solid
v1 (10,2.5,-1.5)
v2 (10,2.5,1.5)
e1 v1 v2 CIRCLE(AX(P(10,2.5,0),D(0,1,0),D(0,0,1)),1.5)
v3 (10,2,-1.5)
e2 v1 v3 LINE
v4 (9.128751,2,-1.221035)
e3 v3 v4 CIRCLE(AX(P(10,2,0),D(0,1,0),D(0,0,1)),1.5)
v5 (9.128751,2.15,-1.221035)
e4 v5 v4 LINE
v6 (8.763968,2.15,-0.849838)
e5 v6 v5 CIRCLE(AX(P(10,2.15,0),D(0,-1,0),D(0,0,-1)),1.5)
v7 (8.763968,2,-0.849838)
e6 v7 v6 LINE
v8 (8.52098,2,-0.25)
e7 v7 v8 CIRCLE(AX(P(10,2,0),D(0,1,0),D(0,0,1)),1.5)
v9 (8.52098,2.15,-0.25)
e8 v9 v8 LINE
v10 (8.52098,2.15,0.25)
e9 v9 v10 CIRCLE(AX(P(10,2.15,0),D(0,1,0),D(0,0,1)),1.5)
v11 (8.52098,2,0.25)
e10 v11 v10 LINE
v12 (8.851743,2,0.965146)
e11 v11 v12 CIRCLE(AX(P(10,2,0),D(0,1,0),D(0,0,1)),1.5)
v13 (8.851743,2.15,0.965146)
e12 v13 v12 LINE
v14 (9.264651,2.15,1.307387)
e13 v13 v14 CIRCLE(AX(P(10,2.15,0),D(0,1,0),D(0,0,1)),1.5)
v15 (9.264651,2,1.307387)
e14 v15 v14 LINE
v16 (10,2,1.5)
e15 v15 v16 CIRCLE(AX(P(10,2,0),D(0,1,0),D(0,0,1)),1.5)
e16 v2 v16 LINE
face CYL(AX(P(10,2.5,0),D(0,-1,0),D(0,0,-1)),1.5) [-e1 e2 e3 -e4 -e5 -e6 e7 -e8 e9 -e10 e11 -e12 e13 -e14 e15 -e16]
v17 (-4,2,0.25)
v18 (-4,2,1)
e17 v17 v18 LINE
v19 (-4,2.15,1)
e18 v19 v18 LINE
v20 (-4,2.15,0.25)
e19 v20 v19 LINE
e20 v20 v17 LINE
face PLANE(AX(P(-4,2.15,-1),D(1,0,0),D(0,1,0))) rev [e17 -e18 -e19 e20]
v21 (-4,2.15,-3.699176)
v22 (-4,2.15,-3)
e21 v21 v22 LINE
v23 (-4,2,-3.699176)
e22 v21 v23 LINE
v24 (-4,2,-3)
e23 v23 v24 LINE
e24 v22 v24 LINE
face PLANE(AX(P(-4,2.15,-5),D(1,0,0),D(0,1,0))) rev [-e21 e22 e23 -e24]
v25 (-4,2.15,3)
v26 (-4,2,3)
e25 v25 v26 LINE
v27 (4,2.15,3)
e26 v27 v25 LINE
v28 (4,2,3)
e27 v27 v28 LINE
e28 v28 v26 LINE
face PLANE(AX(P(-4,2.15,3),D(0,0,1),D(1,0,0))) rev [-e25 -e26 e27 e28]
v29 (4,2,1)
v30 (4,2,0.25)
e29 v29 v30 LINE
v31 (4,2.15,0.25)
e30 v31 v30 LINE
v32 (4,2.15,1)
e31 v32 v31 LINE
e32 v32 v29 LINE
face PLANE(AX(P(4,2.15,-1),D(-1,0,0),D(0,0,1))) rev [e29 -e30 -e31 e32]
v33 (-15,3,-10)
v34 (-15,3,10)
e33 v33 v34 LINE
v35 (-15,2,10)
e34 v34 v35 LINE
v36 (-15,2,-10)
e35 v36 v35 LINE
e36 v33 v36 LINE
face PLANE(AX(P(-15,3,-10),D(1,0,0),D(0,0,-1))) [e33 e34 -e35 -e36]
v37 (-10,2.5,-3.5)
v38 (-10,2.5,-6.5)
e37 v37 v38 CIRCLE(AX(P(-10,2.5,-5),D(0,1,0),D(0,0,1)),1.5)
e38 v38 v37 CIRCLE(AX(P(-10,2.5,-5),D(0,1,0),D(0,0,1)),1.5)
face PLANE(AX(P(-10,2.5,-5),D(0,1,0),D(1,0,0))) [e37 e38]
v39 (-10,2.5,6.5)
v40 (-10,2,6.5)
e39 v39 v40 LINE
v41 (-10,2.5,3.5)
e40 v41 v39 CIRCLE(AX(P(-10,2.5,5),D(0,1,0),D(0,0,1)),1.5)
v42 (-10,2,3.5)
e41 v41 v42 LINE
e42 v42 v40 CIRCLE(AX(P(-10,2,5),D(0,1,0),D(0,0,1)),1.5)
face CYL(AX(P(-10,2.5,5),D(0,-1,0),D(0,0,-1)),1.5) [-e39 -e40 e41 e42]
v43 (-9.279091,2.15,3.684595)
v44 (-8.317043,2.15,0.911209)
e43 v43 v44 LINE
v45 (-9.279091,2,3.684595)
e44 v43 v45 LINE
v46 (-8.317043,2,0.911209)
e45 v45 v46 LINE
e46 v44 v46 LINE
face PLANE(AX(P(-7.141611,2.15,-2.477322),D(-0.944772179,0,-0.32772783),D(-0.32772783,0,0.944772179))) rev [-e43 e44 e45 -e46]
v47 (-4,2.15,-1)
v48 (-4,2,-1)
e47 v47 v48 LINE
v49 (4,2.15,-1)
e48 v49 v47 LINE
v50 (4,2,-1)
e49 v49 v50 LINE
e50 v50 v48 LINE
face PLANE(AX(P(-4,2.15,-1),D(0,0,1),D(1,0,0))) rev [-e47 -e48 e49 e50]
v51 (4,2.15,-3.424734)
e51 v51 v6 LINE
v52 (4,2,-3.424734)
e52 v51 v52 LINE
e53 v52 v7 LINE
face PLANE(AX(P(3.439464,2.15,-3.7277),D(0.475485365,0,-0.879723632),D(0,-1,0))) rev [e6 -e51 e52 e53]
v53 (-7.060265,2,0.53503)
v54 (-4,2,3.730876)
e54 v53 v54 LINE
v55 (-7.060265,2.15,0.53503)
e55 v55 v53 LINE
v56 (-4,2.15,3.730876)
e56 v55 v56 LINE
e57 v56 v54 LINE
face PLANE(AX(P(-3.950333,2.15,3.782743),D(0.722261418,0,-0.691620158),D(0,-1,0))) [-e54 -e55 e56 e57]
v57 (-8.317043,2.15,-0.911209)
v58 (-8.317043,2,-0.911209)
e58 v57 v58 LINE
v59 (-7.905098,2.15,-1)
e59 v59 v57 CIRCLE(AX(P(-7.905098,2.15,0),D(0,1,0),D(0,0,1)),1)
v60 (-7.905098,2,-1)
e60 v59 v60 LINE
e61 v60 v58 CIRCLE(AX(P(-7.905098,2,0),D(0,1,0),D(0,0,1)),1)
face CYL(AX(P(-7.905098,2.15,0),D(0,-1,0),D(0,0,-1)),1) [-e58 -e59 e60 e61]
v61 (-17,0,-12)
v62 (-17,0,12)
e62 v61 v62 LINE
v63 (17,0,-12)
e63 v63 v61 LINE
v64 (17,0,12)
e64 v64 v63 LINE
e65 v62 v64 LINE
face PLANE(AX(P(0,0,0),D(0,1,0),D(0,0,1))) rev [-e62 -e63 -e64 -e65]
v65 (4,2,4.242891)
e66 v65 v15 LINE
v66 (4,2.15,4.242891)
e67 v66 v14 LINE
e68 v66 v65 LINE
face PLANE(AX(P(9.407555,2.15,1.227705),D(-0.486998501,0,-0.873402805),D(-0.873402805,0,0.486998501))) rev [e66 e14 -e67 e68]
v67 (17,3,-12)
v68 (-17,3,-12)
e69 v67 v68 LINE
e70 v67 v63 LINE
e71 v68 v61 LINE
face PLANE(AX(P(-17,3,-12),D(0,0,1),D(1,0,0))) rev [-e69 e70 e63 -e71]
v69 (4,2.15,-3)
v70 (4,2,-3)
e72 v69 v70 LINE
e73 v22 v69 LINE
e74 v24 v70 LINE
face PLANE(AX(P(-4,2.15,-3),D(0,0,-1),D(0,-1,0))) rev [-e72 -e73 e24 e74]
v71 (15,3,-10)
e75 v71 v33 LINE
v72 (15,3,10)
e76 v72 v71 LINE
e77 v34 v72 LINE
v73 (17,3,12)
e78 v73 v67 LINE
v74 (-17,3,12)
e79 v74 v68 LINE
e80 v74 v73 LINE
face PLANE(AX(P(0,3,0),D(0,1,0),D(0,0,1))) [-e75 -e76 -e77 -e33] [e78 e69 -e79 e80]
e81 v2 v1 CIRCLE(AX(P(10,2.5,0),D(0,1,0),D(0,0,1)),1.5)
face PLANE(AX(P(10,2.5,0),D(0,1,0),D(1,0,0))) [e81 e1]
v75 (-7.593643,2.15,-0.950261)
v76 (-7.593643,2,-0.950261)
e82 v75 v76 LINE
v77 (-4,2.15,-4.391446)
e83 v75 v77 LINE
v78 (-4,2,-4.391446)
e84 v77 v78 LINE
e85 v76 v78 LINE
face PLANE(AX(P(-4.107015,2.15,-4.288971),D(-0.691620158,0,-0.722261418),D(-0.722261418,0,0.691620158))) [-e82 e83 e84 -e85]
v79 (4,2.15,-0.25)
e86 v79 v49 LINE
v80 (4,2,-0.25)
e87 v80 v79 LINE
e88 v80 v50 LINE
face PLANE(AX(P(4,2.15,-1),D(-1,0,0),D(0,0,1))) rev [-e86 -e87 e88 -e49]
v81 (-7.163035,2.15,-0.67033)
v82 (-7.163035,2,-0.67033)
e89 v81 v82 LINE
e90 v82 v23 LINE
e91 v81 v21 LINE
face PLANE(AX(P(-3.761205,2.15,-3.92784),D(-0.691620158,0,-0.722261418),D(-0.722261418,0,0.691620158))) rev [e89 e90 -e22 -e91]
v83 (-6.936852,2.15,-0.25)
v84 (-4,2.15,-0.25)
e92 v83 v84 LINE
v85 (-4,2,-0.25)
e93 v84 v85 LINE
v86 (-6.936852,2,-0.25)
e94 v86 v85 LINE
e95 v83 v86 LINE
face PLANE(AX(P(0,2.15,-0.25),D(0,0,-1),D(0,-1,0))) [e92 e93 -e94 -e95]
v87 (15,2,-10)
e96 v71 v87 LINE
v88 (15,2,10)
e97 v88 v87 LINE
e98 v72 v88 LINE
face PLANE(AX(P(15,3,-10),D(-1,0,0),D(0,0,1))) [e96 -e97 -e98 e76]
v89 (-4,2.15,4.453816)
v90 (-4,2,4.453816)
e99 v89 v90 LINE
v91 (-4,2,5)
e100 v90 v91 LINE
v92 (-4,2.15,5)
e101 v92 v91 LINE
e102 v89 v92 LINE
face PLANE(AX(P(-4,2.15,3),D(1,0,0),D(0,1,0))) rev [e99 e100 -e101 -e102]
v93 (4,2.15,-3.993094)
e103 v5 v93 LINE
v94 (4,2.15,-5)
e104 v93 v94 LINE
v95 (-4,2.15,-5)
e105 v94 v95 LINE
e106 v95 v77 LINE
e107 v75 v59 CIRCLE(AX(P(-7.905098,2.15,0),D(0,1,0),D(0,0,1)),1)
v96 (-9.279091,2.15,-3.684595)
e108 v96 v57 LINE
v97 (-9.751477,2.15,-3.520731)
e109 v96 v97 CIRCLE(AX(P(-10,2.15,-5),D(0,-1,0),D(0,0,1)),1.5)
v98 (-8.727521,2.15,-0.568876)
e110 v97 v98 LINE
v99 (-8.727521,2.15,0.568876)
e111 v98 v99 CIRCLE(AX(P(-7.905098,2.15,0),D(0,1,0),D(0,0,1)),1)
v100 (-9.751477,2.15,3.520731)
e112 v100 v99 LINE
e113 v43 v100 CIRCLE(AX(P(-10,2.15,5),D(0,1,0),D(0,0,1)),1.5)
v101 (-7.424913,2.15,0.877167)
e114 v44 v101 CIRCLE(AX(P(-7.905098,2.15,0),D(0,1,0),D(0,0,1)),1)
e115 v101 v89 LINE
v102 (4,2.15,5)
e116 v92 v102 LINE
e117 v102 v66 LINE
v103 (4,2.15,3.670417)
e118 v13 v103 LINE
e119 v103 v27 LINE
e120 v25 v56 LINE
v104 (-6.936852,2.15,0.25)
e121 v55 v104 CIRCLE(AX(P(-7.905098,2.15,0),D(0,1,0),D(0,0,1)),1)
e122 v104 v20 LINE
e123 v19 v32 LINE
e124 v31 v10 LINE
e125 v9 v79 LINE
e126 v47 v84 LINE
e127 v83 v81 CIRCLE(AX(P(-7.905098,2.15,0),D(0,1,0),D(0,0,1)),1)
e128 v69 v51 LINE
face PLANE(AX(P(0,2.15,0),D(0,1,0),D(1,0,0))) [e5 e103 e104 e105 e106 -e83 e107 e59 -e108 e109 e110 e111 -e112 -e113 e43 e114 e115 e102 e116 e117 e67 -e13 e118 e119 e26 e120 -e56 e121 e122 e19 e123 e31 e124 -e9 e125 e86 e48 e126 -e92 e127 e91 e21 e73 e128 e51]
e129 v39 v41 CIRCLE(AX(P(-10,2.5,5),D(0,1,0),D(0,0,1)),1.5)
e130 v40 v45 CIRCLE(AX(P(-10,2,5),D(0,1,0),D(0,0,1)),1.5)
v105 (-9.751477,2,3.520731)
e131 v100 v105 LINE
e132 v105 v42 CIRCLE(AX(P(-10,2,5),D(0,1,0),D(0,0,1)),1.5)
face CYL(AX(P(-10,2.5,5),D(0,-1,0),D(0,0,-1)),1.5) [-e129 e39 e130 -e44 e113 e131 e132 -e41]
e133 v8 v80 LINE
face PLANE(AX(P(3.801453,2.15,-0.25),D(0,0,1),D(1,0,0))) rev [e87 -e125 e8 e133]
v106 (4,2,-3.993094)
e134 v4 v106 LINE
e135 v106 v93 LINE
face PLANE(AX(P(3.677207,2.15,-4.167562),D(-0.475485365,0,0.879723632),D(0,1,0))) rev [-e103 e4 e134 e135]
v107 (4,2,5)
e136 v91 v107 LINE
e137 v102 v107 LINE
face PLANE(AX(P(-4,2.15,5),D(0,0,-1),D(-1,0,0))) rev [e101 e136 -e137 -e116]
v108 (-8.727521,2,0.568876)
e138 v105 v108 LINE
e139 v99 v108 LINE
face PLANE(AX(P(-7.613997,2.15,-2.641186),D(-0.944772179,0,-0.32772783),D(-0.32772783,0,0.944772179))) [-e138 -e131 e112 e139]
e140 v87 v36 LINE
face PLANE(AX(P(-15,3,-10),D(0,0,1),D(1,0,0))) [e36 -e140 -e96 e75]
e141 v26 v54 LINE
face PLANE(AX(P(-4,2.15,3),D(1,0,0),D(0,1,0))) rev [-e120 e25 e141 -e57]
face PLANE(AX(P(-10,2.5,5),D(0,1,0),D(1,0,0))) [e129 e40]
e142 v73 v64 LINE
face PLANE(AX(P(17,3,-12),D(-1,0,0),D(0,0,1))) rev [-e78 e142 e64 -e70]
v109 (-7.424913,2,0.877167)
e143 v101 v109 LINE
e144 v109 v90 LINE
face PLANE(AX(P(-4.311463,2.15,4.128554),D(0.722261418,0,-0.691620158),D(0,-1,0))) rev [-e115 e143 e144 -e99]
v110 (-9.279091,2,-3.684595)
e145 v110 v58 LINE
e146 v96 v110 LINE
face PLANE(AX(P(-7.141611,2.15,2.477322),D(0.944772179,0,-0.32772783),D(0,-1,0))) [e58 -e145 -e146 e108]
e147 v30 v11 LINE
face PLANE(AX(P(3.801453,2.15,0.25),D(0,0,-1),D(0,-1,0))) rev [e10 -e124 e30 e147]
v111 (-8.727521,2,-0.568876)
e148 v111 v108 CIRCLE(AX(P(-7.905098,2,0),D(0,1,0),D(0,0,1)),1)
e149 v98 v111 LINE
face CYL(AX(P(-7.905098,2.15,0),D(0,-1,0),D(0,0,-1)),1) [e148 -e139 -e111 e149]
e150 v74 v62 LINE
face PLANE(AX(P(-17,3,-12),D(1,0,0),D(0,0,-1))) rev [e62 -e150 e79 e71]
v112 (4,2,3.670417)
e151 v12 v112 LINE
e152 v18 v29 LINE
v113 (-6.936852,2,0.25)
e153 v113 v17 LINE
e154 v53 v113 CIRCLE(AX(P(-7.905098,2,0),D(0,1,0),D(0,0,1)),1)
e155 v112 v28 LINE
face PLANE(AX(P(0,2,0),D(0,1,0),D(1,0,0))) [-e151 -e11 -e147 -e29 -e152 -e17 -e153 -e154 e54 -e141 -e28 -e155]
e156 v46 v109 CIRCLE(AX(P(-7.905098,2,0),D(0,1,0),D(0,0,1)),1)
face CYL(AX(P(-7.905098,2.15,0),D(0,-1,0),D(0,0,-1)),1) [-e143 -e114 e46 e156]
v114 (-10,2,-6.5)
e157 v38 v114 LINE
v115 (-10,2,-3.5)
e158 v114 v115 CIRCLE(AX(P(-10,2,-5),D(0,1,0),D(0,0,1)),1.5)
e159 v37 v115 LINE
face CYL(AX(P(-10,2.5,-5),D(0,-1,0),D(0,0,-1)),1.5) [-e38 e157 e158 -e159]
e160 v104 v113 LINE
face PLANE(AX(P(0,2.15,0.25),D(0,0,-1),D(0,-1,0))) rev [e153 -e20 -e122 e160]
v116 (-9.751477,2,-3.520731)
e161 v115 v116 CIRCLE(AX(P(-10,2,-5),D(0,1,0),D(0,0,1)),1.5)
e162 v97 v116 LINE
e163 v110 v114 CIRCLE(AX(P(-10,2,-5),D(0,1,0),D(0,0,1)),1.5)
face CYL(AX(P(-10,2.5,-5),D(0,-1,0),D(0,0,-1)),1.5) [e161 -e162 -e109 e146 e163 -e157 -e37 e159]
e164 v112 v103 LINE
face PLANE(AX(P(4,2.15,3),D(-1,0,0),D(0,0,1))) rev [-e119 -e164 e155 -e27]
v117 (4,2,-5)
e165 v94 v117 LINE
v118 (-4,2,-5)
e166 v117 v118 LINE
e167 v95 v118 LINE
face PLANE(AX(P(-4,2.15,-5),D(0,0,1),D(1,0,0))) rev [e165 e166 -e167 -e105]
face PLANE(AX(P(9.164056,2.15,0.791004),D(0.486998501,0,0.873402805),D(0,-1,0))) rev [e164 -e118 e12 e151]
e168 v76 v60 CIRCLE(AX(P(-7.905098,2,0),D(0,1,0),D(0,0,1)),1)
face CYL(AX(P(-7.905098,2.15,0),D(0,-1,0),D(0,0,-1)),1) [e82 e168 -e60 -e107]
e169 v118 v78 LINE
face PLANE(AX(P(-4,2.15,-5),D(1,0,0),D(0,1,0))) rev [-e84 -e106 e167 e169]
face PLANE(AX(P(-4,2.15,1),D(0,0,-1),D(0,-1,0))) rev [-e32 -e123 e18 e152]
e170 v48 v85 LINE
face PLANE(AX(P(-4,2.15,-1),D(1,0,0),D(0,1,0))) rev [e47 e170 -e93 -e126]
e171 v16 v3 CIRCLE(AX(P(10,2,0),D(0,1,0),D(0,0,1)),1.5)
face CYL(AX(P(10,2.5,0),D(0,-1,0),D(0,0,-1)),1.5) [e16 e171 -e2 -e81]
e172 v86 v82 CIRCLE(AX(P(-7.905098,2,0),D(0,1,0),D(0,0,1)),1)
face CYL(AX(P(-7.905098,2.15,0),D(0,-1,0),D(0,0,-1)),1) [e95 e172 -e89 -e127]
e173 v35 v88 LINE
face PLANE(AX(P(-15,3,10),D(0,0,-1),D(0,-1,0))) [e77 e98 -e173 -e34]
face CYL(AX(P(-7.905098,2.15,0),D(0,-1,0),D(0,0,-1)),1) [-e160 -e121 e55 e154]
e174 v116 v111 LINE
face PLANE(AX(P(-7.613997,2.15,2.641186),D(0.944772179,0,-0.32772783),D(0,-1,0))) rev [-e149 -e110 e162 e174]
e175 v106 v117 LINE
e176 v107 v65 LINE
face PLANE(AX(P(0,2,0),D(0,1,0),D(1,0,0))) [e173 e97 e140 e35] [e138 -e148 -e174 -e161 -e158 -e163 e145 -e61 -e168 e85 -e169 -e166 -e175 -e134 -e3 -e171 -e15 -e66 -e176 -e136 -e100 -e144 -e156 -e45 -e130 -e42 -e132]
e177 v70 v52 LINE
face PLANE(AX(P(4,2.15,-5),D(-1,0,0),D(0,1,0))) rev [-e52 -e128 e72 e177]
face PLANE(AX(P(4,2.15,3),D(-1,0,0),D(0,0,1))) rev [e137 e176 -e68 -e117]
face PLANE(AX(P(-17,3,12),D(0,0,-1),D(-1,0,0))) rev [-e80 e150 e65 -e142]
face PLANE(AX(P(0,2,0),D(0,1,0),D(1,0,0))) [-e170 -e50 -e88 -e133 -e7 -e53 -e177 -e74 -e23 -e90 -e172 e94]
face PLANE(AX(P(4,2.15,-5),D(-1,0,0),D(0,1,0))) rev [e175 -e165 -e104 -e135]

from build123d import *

# Parameters (mm, degrees)
CROQUIS1_W              = 34
CROQUIS1_H              = 24
SALIENTE_EXTRUIR1_DEPTH = 3
CAVIDAD1_START          = 2
CAVIDAD1_OUTLINE_W      = 30
CAVIDAD1_OUTLINE_H      = 20
CAVIDAD1_DEPTH          = 1
CAVIDAD1_START_2        = 2.15
CAVIDAD1_2_DEPTH        = 0.85
CAVIDAD1_START_3        = 2.5
CAVIDAD1_3_OUTLINE_R    = 1.5
CAVIDAD1_3_DEPTH        = 0.5
SALIENTE_EXTRUIR3_DEPTH = 0.5
CROQUIS6_W              = 7.77529117
CROQUIS6_H              = 2
CROQUIS6_W_2            = 2
CROQUIS6_H_2            = 19.575879517
CROQUIS6_W_3            = 7.699177506
CROQUIS6_H_3            = 2.365035227
CROQUIS6_W_4            = 2.895421418
CROQUIS6_W_5            = 7.822528086
CROQUIS6_H_4            = 2.895421418
CROQUIS6_W_6            = 2.695737182
CORTAR_EXTRUIR1_DEPTH   = 0.5


# Read off the part's stored shape, not the designer's step: Cavidad1
with BuildPart() as part:
    # Croquis1 → Saliente-Extruir1 (new body)
    with BuildSketch(Plane(origin=(0, 0, 0), x_dir=(1, 0, 0), z_dir=(0, 1, 0))):
        Rectangle(CROQUIS1_W, CROQUIS1_H)
    extrude(amount=SALIENTE_EXTRUIR1_DEPTH)

    # Cavidad1 outline → Cavidad1 (cut)
    # profile 1 of 3: a face of its own
    with BuildSketch(Plane(origin=(0, 0, 0), x_dir=(1, 0, 0), z_dir=(0, 1, 0)).offset(CAVIDAD1_START)):
        Rectangle(CAVIDAD1_OUTLINE_W, CAVIDAD1_OUTLINE_H)
        with BuildLine():
            Line((-9.751477048, -3.520731146), (-8.727521258, -0.568876422))
            ThreePointArc((-8.727521258, -0.568876422), (-8.905098242, 0), (-8.727521258, 0.568876422))
            Line((-8.727521258, 0.568876422), (-9.751477048, 3.520731146))
            ThreePointArc((-9.751477048, 3.520731146), (-10.491591745, 6.417158268), (-9.279090958, 3.684595061))
            Line((-9.279090958, 3.684595061), (-8.317043268, 0.911208701))
            ThreePointArc((-8.317043268, 0.911208701), (-8.115800994, 0.977550178), (-7.905098242, 1))
            ThreePointArc((-7.905098242, 1), (-7.74739704, 0.987486876), (-7.593642508, 0.950260662))
            Line((-7.593642508, 0.950260662), (-4, 4.391446273))
            Line((-4, 4.391446273), (-4, 5))
            Line((-4, 5), (4, 5))
            Line((4, 5), (4, 3.993093842))
            Line((4, 3.993093842), (9.128751089, 1.221034535))
            ThreePointArc((9.128751089, 1.221034535), (11.497837988, 0.08050691), (9.264650579, -1.307387176))
            Line((9.264650579, -1.307387176), (4, -4.242890617))
            Line((4, -4.242890617), (4, -5))
            Line((4, -5), (-4, -5))
            Line((-4, -5), (-4, -4.453815845))
            Line((-4, -4.453815845), (-7.424912859, -0.87716703))
            ThreePointArc((-7.424912859, -0.87716703), (-7.866968261, -0.999272788), (-8.317043268, -0.911208701))
            Line((-8.317043268, -0.911208701), (-9.279090958, -3.684595061))
            ThreePointArc((-9.279090958, -3.684595061), (-10.491591745, -6.417158268), (-9.751477048, -3.520731146))
        make_face(mode=Mode.SUBTRACT)
    # profile 2 of 3: a face of its own
    with BuildSketch(Plane(origin=(0, 0, 0), x_dir=(1, 0, 0), z_dir=(0, 1, 0)).offset(CAVIDAD1_START)):
        with BuildLine():
            ThreePointArc((8.520980054, 0.25), (8.609737932, 0.563179707), (8.763967569, 0.849837532))
            Line((8.763967569, 0.849837532), (4, 3.424733527))
            Line((4, 3.424733527), (4, 3))
            Line((4, 3), (-4, 3))
            Line((-4, 3), (-4, 3.699176151))
            Line((-4, 3.699176151), (-7.163035026, 0.670329906))
            ThreePointArc((-7.163035026, 0.670329906), (-7.024496987, 0.473858025), (-6.936852406, 0.25))
            Line((-6.936852406, 0.25), (-4, 0.25))
            Line((-4, 0.25), (-4, 1))
            Line((-4, 1), (4, 1))
            Line((4, 1), (4, 0.25))
            Line((4, 0.25), (8.520980054, 0.25))
        make_face()
    # profile 3 of 3: a face of its own
    with BuildSketch(Plane(origin=(0, 0, 0), x_dir=(1, 0, 0), z_dir=(0, 1, 0)).offset(CAVIDAD1_START)):
        with BuildLine():
            Line((4, -3.670417072), (8.851743131, -0.96514567))
            ThreePointArc((8.851743131, -0.96514567), (8.63856539, -0.629679127), (8.520980054, -0.25))
            Line((8.520980054, -0.25), (4, -0.25))
            Line((4, -0.25), (4, -1))
            Line((4, -1), (-4, -1))
            Line((-4, -1), (-4, -0.25))
            Line((-4, -0.25), (-6.936852406, -0.25))
            ThreePointArc((-6.936852406, -0.25), (-6.987424899, -0.397335669), (-7.060265081, -0.535029839))
            Line((-7.060265081, -0.535029839), (-4, -3.730875667))
            Line((-4, -3.730875667), (-4, -3))
            Line((-4, -3), (4, -3))
            Line((4, -3), (4, -3.670417072))
        make_face()
    extrude(amount=CAVIDAD1_DEPTH, mode=Mode.SUBTRACT)

    # Cavidad1 2 outline → Cavidad1 2 (cut)
    with BuildSketch(Plane(origin=(0, 0, 0), x_dir=(1, 0, 0), z_dir=(0, 1, 0)).offset(CAVIDAD1_START_2)):
        with BuildLine():
            ThreePointArc((-8.727521258, 0.568876422), (-8.905098242, 0), (-8.727521258, -0.568876422))
            Line((-8.727521258, -0.568876422), (-9.751477048, -3.520731146))
            ThreePointArc((-9.751477048, -3.520731146), (-9.508408255, -3.582841732), (-9.279090958, -3.684595061))
            Line((-9.279090958, -3.684595061), (-8.317043268, -0.911208701))
            ThreePointArc((-8.317043268, -0.911208701), (-7.866968261, -0.999272788), (-7.424912859, -0.87716703))
            Line((-7.424912859, -0.87716703), (-4, -4.453815845))
            Line((-4, -4.453815845), (-4, -5))
            Line((-4, -5), (4, -5))
            Line((4, -5), (4, -4.242890617))
            Line((4, -4.242890617), (9.264650579, -1.307387176))
            ThreePointArc((9.264650579, -1.307387176), (9.042777207, -1.154869917), (8.851743131, -0.96514567))
            Line((8.851743131, -0.96514567), (4, -3.670417072))
            Line((4, -3.670417072), (4, -3))
            Line((4, -3), (-4, -3))
            Line((-4, -3), (-4, -3.730875667))
            Line((-4, -3.730875667), (-7.060265081, -0.535029839))
            ThreePointArc((-7.060265081, -0.535029839), (-6.987424899, -0.397335669), (-6.936852406, -0.25))
            Line((-6.936852406, -0.25), (-4, -0.25))
            Line((-4, -0.25), (-4, -1))
            Line((-4, -1), (4, -1))
            Line((4, -1), (4, -0.25))
            Line((4, -0.25), (8.520980054, -0.25))
            ThreePointArc((8.520980054, -0.25), (8.5, 0), (8.520980054, 0.25))
            Line((8.520980054, 0.25), (4, 0.25))
            Line((4, 0.25), (4, 1))
            Line((4, 1), (-4, 1))
            Line((-4, 1), (-4, 0.25))
            Line((-4, 0.25), (-6.936852406, 0.25))
            ThreePointArc((-6.936852406, 0.25), (-7.024496987, 0.473858025), (-7.163035026, 0.670329906))
            Line((-7.163035026, 0.670329906), (-4, 3.699176151))
            Line((-4, 3.699176151), (-4, 3))
            Line((-4, 3), (4, 3))
            Line((4, 3), (4, 3.424733527))
            Line((4, 3.424733527), (8.763967569, 0.849837532))
            ThreePointArc((8.763967569, 0.849837532), (8.930137641, 1.051377446), (9.128751089, 1.221034535))
            Line((9.128751089, 1.221034535), (4, 3.993093842))
            Line((4, 3.993093842), (4, 5))
            Line((4, 5), (-4, 5))
            Line((-4, 5), (-4, 4.391446273))
            Line((-4, 4.391446273), (-7.593642508, 0.950260662))
            ThreePointArc((-7.593642508, 0.950260662), (-7.74739704, 0.987486876), (-7.905098242, 1))
            ThreePointArc((-7.905098242, 1), (-8.115800994, 0.977550178), (-8.317043268, 0.911208701))
            Line((-8.317043268, 0.911208701), (-9.279090958, 3.684595061))
            ThreePointArc((-9.279090958, 3.684595061), (-9.508408255, 3.582841732), (-9.751477048, 3.520731146))
            Line((-9.751477048, 3.520731146), (-8.727521258, 0.568876422))
        make_face()
    extrude(amount=CAVIDAD1_2_DEPTH, mode=Mode.SUBTRACT)

    # Cavidad1 3 outline → Cavidad1 3 (cut)
    with BuildSketch(Plane(origin=(0, 0, 0), x_dir=(1, 0, 0), z_dir=(0, 1, 0)).offset(CAVIDAD1_START_3)):
        with Locations((-10, -5)):
            Circle(CAVIDAD1_3_OUTLINE_R)
        with Locations((-10, 5)):
            Circle(CAVIDAD1_3_OUTLINE_R)
        with Locations((10, 0)):
            Circle(CAVIDAD1_3_OUTLINE_R)
    extrude(amount=CAVIDAD1_3_DEPTH, mode=Mode.SUBTRACT)

    # Croquis5 → Saliente-Extruir3 (add)
    with BuildSketch(Plane(origin=(0, 3, 0), x_dir=(1, 0, 0), z_dir=(0, 1, 0))):
        Polygon((-17, 12), (-7, 12), (-7, 10), (-15, 10), (-15, -10), (-7, -10), (-7, -12), (-17, -12), align=None)
        Polygon((7, 12), (17, 12), (17, -12), (7, -12), (7, -10), (15, -10), (15, 10), (7, 10), align=None)
    extrude(amount=SALIENTE_EXTRUIR3_DEPTH)

    # Croquis6 → Cortar-Extruir1 (cut)
    with BuildSketch(Plane(origin=(0, 3.5, 0), x_dir=(1, 0, 0), z_dir=(0, 1, 0))):
        with Locations((-10.887645585, -11)):
            Rectangle(CROQUIS6_W, CROQUIS6_H)
        with Locations((-16, -0.159576746)):
            Rectangle(CROQUIS6_W_2, CROQUIS6_H_2)
        with Locations((-10.887645585, 11)):
            Rectangle(CROQUIS6_W, CROQUIS6_H)
        Polygon((-17, 12), (-17, 9.628363012), (-15, 9.628363012), (-15, 10), (-14.77529117, 10), (-14.77529117, 12), align=None)
        Polygon((-15, -9.947516505), (-17, -9.947516505), (-17, -12), (-14.77529117, -12), (-14.77529117, -10), (-15, -10), align=None)
        with Locations((10.830941942, -11.045685777)):
            Rectangle(CROQUIS6_W_3, CROQUIS6_H_3)
        with Locations((16.128241404, -11.045685777)):
            Rectangle(CROQUIS6_W_4, CROQUIS6_H_3)
        Polygon((17.575952113, -12.22820339), (14.680530695, -12.22820339), (14.680530695, -12.891712404), (17.84219776, -12.891712404), (17.84219776, 13.499887418), (14.680530695, 13.499887418), (14.680530695, 12.667869769), (17.376267877, 12.667869769), (17.376267877, 9.772448351), (14.680530695, 9.772448351), (14.680530695, -9.863168163), (17.575952113, -9.863168163), align=None)
        with Locations((10.769266652, 11.22015906)):
            Rectangle(CROQUIS6_W_5, CROQUIS6_H_4)
        with Locations((16.028399286, 11.22015906)):
            Rectangle(CROQUIS6_W_6, CROQUIS6_H_4)
    extrude(amount=-CORTAR_EXTRUIR1_DEPTH, mode=Mode.SUBTRACT)


solid = part.part
